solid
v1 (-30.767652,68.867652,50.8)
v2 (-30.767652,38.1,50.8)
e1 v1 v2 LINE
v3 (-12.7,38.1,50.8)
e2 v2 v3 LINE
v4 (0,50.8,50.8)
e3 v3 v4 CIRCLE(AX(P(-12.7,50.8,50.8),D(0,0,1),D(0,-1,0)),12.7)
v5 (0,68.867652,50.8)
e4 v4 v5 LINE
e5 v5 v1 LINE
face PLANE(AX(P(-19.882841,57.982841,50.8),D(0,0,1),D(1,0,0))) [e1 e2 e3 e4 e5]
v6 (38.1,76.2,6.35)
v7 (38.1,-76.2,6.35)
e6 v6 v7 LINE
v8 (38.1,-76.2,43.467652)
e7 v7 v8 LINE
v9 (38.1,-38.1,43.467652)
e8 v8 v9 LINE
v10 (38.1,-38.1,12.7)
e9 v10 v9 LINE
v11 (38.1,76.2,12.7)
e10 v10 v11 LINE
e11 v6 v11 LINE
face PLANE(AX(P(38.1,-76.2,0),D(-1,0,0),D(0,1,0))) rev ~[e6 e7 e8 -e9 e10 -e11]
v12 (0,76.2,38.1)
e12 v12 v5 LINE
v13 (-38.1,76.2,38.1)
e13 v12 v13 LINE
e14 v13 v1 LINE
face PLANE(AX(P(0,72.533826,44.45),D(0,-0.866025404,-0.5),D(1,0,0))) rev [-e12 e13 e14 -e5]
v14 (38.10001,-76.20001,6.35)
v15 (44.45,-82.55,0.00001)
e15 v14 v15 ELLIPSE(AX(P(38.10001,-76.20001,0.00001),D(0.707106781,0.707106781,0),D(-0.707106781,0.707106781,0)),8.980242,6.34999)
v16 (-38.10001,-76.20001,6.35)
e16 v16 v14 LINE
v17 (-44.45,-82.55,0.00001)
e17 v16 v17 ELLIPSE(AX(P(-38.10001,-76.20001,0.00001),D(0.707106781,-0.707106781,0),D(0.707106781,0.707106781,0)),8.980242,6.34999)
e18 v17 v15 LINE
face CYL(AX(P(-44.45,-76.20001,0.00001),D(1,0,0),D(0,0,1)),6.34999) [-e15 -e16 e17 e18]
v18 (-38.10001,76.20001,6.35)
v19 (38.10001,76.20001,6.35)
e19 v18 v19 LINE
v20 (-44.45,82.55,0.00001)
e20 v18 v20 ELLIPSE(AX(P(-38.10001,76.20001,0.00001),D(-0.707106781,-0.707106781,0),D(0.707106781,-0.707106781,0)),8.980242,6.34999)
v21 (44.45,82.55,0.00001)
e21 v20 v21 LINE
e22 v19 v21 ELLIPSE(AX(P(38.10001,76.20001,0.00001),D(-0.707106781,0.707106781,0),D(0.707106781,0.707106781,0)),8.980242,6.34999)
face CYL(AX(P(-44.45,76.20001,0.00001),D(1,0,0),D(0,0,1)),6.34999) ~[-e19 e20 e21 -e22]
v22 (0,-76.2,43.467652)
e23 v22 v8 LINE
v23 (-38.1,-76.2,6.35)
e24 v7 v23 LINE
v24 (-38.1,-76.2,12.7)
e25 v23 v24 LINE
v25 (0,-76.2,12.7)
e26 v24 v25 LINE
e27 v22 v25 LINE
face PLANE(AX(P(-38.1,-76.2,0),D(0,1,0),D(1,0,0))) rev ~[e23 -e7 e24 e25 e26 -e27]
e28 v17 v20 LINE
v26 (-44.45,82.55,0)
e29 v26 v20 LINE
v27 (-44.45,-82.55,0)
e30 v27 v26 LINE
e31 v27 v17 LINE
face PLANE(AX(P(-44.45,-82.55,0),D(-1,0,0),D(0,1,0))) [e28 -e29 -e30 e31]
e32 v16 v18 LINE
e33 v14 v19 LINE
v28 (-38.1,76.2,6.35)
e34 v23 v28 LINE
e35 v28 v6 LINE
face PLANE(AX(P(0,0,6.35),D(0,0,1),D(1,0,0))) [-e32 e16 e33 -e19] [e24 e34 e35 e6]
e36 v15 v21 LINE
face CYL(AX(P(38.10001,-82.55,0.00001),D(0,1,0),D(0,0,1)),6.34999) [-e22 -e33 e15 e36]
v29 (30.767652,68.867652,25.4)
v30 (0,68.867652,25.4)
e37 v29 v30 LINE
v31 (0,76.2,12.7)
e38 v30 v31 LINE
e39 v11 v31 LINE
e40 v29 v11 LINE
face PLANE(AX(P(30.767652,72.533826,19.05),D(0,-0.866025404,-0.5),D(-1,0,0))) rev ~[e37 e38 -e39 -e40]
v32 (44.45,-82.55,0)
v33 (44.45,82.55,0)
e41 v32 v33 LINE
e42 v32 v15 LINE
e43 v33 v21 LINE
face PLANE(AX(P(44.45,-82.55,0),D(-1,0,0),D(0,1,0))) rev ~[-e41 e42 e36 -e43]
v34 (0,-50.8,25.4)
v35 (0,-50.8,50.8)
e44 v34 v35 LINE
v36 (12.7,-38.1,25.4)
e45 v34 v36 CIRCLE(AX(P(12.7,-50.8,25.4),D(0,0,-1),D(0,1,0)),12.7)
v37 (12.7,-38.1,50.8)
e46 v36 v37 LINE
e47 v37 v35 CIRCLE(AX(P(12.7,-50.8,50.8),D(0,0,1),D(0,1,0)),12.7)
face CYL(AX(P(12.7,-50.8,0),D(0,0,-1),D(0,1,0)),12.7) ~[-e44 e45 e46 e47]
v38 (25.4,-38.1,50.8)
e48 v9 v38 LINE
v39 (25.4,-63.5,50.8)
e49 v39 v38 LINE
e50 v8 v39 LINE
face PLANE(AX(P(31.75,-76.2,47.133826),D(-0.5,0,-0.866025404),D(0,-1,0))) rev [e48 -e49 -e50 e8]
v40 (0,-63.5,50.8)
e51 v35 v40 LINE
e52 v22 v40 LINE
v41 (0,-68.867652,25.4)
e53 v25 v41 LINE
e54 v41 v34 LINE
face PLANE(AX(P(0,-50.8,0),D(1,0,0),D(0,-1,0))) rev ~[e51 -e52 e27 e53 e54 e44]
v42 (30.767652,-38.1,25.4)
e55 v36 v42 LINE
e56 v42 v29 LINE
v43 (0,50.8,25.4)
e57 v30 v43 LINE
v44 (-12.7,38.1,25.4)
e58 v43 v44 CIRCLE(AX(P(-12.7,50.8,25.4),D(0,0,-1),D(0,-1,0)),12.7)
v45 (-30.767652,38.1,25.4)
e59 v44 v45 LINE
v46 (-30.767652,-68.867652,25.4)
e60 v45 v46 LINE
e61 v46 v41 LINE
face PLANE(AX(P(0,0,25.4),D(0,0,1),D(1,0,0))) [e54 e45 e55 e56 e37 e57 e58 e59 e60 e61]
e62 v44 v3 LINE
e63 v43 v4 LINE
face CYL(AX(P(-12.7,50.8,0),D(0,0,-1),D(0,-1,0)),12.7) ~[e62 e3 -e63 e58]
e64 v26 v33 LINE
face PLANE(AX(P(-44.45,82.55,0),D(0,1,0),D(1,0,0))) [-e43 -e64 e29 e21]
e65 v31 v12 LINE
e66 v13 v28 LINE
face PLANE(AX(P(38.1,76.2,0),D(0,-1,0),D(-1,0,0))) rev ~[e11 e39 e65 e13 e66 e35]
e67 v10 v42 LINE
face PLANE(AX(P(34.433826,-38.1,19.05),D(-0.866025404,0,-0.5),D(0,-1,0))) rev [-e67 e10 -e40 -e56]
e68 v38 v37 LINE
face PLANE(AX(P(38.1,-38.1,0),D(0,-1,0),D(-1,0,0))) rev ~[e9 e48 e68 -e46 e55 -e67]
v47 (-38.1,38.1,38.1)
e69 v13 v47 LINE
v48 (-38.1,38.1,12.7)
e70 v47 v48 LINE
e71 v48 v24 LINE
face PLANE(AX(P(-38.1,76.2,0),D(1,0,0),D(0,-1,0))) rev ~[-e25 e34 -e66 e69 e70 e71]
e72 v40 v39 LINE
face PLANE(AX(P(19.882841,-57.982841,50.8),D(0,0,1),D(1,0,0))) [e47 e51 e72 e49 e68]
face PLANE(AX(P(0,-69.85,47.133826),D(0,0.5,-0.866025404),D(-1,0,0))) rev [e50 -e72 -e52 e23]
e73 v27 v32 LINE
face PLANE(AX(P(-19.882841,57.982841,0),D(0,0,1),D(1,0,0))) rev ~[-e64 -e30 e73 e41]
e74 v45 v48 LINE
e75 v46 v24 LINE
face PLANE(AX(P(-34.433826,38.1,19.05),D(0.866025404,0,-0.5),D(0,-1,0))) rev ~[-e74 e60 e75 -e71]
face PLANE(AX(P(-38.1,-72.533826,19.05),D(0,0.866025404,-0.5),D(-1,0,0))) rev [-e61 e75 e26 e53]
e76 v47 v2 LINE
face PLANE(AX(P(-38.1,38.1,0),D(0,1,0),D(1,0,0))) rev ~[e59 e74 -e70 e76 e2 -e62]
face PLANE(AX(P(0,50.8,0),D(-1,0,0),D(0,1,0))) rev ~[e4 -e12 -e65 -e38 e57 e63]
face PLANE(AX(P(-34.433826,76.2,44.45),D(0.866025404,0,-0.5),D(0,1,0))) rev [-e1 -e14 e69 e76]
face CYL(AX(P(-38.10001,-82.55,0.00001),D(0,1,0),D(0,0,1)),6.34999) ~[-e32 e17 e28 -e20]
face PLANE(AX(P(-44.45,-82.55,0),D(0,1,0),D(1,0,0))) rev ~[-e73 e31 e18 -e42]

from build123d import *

# Parameters (mm, degrees)
F0_W        = 88.9
F0_H        = 165.1
F1_DEPTH    = 6.35
F2_DEPTH    = 25.4
F3_DEPTH    = 50.8
F4_C1_SIZE2 = 7.3323484187
F4_C1_SIZE  = 12.7
F4_C2_SIZE2 = 7.3323484187
F4_C2_SIZE  = 12.7
F4_C3_SIZE2 = 12.7
F4_C3_SIZE  = 7.3323484187
F4_C4_SIZE2 = 12.7
F4_C4_SIZE  = 7.3323484187
F5_R        = 6.34999
F6_C1_SIZE2 = 7.3323484187
F6_C1_SIZE  = 12.7
F6_C2_SIZE2 = 7.3323484187
F6_C2_SIZE  = 12.7
F6_C3_SIZE2 = 12.7
F6_C3_SIZE  = 7.3323484187
F6_C4_SIZE2 = 12.7
F6_C4_SIZE  = 7.3323484187


# Not quite as in the source:
# - a fillet or chamfer is up to 0.001 mm smaller than in the source, because OpenCascade refuses the exact size


with BuildPart() as f1:
    # F0 (on Top) → F1 (new body)
    with BuildSketch(Plane.XY):
        Rectangle(F0_W, F0_H)
        Polygon((0, 76.2), (38.1, 76.2), (38.1, -38.1), (38.1, -76.2), (0, -76.2), (-38.1, -76.2), (-38.1, 38.1), (-38.1, 76.2), align=None, mode=Mode.SUBTRACT)
        with BuildLine():
            Line((0, 50.8), (0, 76.2))
            Line((0, 76.2), (-38.1, 76.2))
            Line((-38.1, 76.2), (-38.1, 38.1))
            Line((-38.1, 38.1), (-12.7, 38.1))
            ThreePointArc((-12.7, 38.1), (-3.7197438789, 41.8197438789), (0, 50.8))
        make_face()
        with BuildLine():
            Line((38.1, -38.1), (38.1, 76.2))
            Line((38.1, 76.2), (0, 76.2))
            Line((0, 76.2), (0, 50.8))
            ThreePointArc((0, 50.8), (-3.7197438789, 41.8197438789), (-12.7, 38.1))
            Line((-12.7, 38.1), (-38.1, 38.1))
            Line((-38.1, 38.1), (-38.1, -76.2))
            Line((-38.1, -76.2), (0, -76.2))
            Line((0, -76.2), (0, -50.8))
            ThreePointArc((0, -50.8), (3.7197438789, -41.8197438789), (12.7, -38.1))
            Line((12.7, -38.1), (38.1, -38.1))
        make_face()
        with BuildLine():
            Line((38.1, -76.2), (38.1, -38.1))
            Line((38.1, -38.1), (12.7, -38.1))
            ThreePointArc((12.7, -38.1), (3.7197438789, -41.8197438789), (0, -50.8))
            Line((0, -50.8), (0, -76.2))
            Line((0, -76.2), (38.1, -76.2))
        make_face()
    extrude(amount=F1_DEPTH)

    # F0 (on Top) → F2 (join)
    with BuildSketch(Plane.XY):
        with BuildLine():
            Line((38.1, -38.1), (38.1, 76.2))
            Line((38.1, 76.2), (0, 76.2))
            Line((0, 76.2), (0, 50.8))
            ThreePointArc((0, 50.8), (-3.7197438789, 41.8197438789), (-12.7, 38.1))
            Line((-12.7, 38.1), (-38.1, 38.1))
            Line((-38.1, 38.1), (-38.1, -76.2))
            Line((-38.1, -76.2), (0, -76.2))
            Line((0, -76.2), (0, -50.8))
            ThreePointArc((0, -50.8), (3.7197438789, -41.8197438789), (12.7, -38.1))
            Line((12.7, -38.1), (38.1, -38.1))
        make_face()
        with BuildLine():
            Line((0, 50.8), (0, 76.2))
            Line((0, 76.2), (-38.1, 76.2))
            Line((-38.1, 76.2), (-38.1, 38.1))
            Line((-38.1, 38.1), (-12.7, 38.1))
            ThreePointArc((-12.7, 38.1), (-3.7197438789, 41.8197438789), (0, 50.8))
        make_face()
        with BuildLine():
            Line((38.1, -76.2), (38.1, -38.1))
            Line((38.1, -38.1), (12.7, -38.1))
            ThreePointArc((12.7, -38.1), (3.7197438789, -41.8197438789), (0, -50.8))
            Line((0, -50.8), (0, -76.2))
            Line((0, -76.2), (38.1, -76.2))
        make_face()
    extrude(amount=F2_DEPTH)

    # F0 (on Top) → F3 (join)
    with BuildSketch(Plane.XY):
        with BuildLine():
            Line((0, 50.8), (0, 76.2))
            Line((0, 76.2), (-38.1, 76.2))
            Line((-38.1, 76.2), (-38.1, 38.1))
            Line((-38.1, 38.1), (-12.7, 38.1))
            ThreePointArc((-12.7, 38.1), (-3.7197438789, 41.8197438789), (0, 50.8))
        make_face()
        with BuildLine():
            Line((38.1, -76.2), (38.1, -38.1))
            Line((38.1, -38.1), (12.7, -38.1))
            ThreePointArc((12.7, -38.1), (3.7197438789, -41.8197438789), (0, -50.8))
            Line((0, -50.8), (0, -76.2))
            Line((0, -76.2), (38.1, -76.2))
        make_face()
    extrude(amount=F3_DEPTH)

    # F4: chamfer of 12.7 x 7.3323484187 on 4 edges, made by hand

    # F4_c1
    f4_c1_edges = [f1.edges().sort_by_distance(p)[0] for p in [
        (-19.05, -76.2, 25.4),
    ]]
    f4_c1_side = f1.faces().sort_by_distance((-19.05, -76.2, 25.2533530316))[0]
    chamfer(f4_c1_edges, length=F4_C1_SIZE, length2=F4_C1_SIZE2, reference=f4_c1_side)

    # F4_c2
    f4_c2_edges = [f1.edges().sort_by_distance(p)[0] for p in [
        (38.1, 19.05, 25.4),
    ]]
    f4_c2_side = f1.faces().sort_by_distance((38.1, 19.05, 25.2533530316))[0]
    chamfer(f4_c2_edges, length=F4_C2_SIZE, length2=F4_C2_SIZE2, reference=f4_c2_side)

    # F4_c3
    f4_c3_edges = [f1.edges().sort_by_distance(p)[0] for p in [
        (-38.1, -15.3838257906, 25.4),
    ]]
    f4_c3_side = f1.faces().sort_by_distance((-37.9533530316, -15.3838257906, 25.4))[0]
    chamfer(f4_c3_edges, length=F4_C3_SIZE, length2=F4_C3_SIZE2, reference=f4_c3_side)

    # F4_c4
    f4_c4_edges = [f1.edges().sort_by_distance(p)[0] for p in [
        (15.3838257906, 76.2, 25.4),
    ]]
    f4_c4_side = f1.faces().sort_by_distance((15.3838257906, 76.0533530316, 25.4))[0]
    chamfer(f4_c4_edges, length=F4_C4_SIZE, length2=F4_C4_SIZE2, reference=f4_c4_side)

    # F5 (radius 6.35 in the source; OpenCascade refuses exactly that, so slightly less here)
    f5_edges = [f1.edges().sort_by_distance(p)[0] for p in [
        (0, 82.55, 6.35),
        (44.45, 0, 6.35),
        (-44.45, 0, 6.35),
        (0, -82.55, 6.35),
    ]]
    fillet(f5_edges, radius=F5_R)

    # F6: chamfer of 12.7 x 7.3323484187 on 4 edges, made by hand

    # F6_c1
    f6_c1_edges = [f1.edges().sort_by_distance(p)[0] for p in [
        (-38.1, 57.15, 50.8),
    ]]
    f6_c1_side = f1.faces().sort_by_distance((-38.1, 57.15, 50.6533530316))[0]
    chamfer(f6_c1_edges, length=F6_C1_SIZE, length2=F6_C1_SIZE2, reference=f6_c1_side)

    # F6_c2
    f6_c2_edges = [f1.edges().sort_by_distance(p)[0] for p in [
        (-15.3838257906, 76.2, 50.8),
    ]]
    f6_c2_side = f1.faces().sort_by_distance((-15.3838257906, 76.2, 50.6533530316))[0]
    chamfer(f6_c2_edges, length=F6_C2_SIZE, length2=F6_C2_SIZE2, reference=f6_c2_side)

    # F6_c3
    f6_c3_edges = [f1.edges().sort_by_distance(p)[0] for p in [
        (38.1, -57.15, 50.8),
    ]]
    f6_c3_side = f1.faces().sort_by_distance((38.1, -57.15, 50.6533530316))[0]
    chamfer(f6_c3_edges, length=F6_C3_SIZE, length2=F6_C3_SIZE2, reference=f6_c3_side)

    # F6_c4
    f6_c4_edges = [f1.edges().sort_by_distance(p)[0] for p in [
        (12.7, -76.2, 50.8),
    ]]
    f6_c4_side = f1.faces().sort_by_distance((12.7, -76.2, 50.6533530316))[0]
    chamfer(f6_c4_edges, length=F6_C4_SIZE, length2=F6_C4_SIZE2, reference=f6_c4_side)


solid = f1.part
